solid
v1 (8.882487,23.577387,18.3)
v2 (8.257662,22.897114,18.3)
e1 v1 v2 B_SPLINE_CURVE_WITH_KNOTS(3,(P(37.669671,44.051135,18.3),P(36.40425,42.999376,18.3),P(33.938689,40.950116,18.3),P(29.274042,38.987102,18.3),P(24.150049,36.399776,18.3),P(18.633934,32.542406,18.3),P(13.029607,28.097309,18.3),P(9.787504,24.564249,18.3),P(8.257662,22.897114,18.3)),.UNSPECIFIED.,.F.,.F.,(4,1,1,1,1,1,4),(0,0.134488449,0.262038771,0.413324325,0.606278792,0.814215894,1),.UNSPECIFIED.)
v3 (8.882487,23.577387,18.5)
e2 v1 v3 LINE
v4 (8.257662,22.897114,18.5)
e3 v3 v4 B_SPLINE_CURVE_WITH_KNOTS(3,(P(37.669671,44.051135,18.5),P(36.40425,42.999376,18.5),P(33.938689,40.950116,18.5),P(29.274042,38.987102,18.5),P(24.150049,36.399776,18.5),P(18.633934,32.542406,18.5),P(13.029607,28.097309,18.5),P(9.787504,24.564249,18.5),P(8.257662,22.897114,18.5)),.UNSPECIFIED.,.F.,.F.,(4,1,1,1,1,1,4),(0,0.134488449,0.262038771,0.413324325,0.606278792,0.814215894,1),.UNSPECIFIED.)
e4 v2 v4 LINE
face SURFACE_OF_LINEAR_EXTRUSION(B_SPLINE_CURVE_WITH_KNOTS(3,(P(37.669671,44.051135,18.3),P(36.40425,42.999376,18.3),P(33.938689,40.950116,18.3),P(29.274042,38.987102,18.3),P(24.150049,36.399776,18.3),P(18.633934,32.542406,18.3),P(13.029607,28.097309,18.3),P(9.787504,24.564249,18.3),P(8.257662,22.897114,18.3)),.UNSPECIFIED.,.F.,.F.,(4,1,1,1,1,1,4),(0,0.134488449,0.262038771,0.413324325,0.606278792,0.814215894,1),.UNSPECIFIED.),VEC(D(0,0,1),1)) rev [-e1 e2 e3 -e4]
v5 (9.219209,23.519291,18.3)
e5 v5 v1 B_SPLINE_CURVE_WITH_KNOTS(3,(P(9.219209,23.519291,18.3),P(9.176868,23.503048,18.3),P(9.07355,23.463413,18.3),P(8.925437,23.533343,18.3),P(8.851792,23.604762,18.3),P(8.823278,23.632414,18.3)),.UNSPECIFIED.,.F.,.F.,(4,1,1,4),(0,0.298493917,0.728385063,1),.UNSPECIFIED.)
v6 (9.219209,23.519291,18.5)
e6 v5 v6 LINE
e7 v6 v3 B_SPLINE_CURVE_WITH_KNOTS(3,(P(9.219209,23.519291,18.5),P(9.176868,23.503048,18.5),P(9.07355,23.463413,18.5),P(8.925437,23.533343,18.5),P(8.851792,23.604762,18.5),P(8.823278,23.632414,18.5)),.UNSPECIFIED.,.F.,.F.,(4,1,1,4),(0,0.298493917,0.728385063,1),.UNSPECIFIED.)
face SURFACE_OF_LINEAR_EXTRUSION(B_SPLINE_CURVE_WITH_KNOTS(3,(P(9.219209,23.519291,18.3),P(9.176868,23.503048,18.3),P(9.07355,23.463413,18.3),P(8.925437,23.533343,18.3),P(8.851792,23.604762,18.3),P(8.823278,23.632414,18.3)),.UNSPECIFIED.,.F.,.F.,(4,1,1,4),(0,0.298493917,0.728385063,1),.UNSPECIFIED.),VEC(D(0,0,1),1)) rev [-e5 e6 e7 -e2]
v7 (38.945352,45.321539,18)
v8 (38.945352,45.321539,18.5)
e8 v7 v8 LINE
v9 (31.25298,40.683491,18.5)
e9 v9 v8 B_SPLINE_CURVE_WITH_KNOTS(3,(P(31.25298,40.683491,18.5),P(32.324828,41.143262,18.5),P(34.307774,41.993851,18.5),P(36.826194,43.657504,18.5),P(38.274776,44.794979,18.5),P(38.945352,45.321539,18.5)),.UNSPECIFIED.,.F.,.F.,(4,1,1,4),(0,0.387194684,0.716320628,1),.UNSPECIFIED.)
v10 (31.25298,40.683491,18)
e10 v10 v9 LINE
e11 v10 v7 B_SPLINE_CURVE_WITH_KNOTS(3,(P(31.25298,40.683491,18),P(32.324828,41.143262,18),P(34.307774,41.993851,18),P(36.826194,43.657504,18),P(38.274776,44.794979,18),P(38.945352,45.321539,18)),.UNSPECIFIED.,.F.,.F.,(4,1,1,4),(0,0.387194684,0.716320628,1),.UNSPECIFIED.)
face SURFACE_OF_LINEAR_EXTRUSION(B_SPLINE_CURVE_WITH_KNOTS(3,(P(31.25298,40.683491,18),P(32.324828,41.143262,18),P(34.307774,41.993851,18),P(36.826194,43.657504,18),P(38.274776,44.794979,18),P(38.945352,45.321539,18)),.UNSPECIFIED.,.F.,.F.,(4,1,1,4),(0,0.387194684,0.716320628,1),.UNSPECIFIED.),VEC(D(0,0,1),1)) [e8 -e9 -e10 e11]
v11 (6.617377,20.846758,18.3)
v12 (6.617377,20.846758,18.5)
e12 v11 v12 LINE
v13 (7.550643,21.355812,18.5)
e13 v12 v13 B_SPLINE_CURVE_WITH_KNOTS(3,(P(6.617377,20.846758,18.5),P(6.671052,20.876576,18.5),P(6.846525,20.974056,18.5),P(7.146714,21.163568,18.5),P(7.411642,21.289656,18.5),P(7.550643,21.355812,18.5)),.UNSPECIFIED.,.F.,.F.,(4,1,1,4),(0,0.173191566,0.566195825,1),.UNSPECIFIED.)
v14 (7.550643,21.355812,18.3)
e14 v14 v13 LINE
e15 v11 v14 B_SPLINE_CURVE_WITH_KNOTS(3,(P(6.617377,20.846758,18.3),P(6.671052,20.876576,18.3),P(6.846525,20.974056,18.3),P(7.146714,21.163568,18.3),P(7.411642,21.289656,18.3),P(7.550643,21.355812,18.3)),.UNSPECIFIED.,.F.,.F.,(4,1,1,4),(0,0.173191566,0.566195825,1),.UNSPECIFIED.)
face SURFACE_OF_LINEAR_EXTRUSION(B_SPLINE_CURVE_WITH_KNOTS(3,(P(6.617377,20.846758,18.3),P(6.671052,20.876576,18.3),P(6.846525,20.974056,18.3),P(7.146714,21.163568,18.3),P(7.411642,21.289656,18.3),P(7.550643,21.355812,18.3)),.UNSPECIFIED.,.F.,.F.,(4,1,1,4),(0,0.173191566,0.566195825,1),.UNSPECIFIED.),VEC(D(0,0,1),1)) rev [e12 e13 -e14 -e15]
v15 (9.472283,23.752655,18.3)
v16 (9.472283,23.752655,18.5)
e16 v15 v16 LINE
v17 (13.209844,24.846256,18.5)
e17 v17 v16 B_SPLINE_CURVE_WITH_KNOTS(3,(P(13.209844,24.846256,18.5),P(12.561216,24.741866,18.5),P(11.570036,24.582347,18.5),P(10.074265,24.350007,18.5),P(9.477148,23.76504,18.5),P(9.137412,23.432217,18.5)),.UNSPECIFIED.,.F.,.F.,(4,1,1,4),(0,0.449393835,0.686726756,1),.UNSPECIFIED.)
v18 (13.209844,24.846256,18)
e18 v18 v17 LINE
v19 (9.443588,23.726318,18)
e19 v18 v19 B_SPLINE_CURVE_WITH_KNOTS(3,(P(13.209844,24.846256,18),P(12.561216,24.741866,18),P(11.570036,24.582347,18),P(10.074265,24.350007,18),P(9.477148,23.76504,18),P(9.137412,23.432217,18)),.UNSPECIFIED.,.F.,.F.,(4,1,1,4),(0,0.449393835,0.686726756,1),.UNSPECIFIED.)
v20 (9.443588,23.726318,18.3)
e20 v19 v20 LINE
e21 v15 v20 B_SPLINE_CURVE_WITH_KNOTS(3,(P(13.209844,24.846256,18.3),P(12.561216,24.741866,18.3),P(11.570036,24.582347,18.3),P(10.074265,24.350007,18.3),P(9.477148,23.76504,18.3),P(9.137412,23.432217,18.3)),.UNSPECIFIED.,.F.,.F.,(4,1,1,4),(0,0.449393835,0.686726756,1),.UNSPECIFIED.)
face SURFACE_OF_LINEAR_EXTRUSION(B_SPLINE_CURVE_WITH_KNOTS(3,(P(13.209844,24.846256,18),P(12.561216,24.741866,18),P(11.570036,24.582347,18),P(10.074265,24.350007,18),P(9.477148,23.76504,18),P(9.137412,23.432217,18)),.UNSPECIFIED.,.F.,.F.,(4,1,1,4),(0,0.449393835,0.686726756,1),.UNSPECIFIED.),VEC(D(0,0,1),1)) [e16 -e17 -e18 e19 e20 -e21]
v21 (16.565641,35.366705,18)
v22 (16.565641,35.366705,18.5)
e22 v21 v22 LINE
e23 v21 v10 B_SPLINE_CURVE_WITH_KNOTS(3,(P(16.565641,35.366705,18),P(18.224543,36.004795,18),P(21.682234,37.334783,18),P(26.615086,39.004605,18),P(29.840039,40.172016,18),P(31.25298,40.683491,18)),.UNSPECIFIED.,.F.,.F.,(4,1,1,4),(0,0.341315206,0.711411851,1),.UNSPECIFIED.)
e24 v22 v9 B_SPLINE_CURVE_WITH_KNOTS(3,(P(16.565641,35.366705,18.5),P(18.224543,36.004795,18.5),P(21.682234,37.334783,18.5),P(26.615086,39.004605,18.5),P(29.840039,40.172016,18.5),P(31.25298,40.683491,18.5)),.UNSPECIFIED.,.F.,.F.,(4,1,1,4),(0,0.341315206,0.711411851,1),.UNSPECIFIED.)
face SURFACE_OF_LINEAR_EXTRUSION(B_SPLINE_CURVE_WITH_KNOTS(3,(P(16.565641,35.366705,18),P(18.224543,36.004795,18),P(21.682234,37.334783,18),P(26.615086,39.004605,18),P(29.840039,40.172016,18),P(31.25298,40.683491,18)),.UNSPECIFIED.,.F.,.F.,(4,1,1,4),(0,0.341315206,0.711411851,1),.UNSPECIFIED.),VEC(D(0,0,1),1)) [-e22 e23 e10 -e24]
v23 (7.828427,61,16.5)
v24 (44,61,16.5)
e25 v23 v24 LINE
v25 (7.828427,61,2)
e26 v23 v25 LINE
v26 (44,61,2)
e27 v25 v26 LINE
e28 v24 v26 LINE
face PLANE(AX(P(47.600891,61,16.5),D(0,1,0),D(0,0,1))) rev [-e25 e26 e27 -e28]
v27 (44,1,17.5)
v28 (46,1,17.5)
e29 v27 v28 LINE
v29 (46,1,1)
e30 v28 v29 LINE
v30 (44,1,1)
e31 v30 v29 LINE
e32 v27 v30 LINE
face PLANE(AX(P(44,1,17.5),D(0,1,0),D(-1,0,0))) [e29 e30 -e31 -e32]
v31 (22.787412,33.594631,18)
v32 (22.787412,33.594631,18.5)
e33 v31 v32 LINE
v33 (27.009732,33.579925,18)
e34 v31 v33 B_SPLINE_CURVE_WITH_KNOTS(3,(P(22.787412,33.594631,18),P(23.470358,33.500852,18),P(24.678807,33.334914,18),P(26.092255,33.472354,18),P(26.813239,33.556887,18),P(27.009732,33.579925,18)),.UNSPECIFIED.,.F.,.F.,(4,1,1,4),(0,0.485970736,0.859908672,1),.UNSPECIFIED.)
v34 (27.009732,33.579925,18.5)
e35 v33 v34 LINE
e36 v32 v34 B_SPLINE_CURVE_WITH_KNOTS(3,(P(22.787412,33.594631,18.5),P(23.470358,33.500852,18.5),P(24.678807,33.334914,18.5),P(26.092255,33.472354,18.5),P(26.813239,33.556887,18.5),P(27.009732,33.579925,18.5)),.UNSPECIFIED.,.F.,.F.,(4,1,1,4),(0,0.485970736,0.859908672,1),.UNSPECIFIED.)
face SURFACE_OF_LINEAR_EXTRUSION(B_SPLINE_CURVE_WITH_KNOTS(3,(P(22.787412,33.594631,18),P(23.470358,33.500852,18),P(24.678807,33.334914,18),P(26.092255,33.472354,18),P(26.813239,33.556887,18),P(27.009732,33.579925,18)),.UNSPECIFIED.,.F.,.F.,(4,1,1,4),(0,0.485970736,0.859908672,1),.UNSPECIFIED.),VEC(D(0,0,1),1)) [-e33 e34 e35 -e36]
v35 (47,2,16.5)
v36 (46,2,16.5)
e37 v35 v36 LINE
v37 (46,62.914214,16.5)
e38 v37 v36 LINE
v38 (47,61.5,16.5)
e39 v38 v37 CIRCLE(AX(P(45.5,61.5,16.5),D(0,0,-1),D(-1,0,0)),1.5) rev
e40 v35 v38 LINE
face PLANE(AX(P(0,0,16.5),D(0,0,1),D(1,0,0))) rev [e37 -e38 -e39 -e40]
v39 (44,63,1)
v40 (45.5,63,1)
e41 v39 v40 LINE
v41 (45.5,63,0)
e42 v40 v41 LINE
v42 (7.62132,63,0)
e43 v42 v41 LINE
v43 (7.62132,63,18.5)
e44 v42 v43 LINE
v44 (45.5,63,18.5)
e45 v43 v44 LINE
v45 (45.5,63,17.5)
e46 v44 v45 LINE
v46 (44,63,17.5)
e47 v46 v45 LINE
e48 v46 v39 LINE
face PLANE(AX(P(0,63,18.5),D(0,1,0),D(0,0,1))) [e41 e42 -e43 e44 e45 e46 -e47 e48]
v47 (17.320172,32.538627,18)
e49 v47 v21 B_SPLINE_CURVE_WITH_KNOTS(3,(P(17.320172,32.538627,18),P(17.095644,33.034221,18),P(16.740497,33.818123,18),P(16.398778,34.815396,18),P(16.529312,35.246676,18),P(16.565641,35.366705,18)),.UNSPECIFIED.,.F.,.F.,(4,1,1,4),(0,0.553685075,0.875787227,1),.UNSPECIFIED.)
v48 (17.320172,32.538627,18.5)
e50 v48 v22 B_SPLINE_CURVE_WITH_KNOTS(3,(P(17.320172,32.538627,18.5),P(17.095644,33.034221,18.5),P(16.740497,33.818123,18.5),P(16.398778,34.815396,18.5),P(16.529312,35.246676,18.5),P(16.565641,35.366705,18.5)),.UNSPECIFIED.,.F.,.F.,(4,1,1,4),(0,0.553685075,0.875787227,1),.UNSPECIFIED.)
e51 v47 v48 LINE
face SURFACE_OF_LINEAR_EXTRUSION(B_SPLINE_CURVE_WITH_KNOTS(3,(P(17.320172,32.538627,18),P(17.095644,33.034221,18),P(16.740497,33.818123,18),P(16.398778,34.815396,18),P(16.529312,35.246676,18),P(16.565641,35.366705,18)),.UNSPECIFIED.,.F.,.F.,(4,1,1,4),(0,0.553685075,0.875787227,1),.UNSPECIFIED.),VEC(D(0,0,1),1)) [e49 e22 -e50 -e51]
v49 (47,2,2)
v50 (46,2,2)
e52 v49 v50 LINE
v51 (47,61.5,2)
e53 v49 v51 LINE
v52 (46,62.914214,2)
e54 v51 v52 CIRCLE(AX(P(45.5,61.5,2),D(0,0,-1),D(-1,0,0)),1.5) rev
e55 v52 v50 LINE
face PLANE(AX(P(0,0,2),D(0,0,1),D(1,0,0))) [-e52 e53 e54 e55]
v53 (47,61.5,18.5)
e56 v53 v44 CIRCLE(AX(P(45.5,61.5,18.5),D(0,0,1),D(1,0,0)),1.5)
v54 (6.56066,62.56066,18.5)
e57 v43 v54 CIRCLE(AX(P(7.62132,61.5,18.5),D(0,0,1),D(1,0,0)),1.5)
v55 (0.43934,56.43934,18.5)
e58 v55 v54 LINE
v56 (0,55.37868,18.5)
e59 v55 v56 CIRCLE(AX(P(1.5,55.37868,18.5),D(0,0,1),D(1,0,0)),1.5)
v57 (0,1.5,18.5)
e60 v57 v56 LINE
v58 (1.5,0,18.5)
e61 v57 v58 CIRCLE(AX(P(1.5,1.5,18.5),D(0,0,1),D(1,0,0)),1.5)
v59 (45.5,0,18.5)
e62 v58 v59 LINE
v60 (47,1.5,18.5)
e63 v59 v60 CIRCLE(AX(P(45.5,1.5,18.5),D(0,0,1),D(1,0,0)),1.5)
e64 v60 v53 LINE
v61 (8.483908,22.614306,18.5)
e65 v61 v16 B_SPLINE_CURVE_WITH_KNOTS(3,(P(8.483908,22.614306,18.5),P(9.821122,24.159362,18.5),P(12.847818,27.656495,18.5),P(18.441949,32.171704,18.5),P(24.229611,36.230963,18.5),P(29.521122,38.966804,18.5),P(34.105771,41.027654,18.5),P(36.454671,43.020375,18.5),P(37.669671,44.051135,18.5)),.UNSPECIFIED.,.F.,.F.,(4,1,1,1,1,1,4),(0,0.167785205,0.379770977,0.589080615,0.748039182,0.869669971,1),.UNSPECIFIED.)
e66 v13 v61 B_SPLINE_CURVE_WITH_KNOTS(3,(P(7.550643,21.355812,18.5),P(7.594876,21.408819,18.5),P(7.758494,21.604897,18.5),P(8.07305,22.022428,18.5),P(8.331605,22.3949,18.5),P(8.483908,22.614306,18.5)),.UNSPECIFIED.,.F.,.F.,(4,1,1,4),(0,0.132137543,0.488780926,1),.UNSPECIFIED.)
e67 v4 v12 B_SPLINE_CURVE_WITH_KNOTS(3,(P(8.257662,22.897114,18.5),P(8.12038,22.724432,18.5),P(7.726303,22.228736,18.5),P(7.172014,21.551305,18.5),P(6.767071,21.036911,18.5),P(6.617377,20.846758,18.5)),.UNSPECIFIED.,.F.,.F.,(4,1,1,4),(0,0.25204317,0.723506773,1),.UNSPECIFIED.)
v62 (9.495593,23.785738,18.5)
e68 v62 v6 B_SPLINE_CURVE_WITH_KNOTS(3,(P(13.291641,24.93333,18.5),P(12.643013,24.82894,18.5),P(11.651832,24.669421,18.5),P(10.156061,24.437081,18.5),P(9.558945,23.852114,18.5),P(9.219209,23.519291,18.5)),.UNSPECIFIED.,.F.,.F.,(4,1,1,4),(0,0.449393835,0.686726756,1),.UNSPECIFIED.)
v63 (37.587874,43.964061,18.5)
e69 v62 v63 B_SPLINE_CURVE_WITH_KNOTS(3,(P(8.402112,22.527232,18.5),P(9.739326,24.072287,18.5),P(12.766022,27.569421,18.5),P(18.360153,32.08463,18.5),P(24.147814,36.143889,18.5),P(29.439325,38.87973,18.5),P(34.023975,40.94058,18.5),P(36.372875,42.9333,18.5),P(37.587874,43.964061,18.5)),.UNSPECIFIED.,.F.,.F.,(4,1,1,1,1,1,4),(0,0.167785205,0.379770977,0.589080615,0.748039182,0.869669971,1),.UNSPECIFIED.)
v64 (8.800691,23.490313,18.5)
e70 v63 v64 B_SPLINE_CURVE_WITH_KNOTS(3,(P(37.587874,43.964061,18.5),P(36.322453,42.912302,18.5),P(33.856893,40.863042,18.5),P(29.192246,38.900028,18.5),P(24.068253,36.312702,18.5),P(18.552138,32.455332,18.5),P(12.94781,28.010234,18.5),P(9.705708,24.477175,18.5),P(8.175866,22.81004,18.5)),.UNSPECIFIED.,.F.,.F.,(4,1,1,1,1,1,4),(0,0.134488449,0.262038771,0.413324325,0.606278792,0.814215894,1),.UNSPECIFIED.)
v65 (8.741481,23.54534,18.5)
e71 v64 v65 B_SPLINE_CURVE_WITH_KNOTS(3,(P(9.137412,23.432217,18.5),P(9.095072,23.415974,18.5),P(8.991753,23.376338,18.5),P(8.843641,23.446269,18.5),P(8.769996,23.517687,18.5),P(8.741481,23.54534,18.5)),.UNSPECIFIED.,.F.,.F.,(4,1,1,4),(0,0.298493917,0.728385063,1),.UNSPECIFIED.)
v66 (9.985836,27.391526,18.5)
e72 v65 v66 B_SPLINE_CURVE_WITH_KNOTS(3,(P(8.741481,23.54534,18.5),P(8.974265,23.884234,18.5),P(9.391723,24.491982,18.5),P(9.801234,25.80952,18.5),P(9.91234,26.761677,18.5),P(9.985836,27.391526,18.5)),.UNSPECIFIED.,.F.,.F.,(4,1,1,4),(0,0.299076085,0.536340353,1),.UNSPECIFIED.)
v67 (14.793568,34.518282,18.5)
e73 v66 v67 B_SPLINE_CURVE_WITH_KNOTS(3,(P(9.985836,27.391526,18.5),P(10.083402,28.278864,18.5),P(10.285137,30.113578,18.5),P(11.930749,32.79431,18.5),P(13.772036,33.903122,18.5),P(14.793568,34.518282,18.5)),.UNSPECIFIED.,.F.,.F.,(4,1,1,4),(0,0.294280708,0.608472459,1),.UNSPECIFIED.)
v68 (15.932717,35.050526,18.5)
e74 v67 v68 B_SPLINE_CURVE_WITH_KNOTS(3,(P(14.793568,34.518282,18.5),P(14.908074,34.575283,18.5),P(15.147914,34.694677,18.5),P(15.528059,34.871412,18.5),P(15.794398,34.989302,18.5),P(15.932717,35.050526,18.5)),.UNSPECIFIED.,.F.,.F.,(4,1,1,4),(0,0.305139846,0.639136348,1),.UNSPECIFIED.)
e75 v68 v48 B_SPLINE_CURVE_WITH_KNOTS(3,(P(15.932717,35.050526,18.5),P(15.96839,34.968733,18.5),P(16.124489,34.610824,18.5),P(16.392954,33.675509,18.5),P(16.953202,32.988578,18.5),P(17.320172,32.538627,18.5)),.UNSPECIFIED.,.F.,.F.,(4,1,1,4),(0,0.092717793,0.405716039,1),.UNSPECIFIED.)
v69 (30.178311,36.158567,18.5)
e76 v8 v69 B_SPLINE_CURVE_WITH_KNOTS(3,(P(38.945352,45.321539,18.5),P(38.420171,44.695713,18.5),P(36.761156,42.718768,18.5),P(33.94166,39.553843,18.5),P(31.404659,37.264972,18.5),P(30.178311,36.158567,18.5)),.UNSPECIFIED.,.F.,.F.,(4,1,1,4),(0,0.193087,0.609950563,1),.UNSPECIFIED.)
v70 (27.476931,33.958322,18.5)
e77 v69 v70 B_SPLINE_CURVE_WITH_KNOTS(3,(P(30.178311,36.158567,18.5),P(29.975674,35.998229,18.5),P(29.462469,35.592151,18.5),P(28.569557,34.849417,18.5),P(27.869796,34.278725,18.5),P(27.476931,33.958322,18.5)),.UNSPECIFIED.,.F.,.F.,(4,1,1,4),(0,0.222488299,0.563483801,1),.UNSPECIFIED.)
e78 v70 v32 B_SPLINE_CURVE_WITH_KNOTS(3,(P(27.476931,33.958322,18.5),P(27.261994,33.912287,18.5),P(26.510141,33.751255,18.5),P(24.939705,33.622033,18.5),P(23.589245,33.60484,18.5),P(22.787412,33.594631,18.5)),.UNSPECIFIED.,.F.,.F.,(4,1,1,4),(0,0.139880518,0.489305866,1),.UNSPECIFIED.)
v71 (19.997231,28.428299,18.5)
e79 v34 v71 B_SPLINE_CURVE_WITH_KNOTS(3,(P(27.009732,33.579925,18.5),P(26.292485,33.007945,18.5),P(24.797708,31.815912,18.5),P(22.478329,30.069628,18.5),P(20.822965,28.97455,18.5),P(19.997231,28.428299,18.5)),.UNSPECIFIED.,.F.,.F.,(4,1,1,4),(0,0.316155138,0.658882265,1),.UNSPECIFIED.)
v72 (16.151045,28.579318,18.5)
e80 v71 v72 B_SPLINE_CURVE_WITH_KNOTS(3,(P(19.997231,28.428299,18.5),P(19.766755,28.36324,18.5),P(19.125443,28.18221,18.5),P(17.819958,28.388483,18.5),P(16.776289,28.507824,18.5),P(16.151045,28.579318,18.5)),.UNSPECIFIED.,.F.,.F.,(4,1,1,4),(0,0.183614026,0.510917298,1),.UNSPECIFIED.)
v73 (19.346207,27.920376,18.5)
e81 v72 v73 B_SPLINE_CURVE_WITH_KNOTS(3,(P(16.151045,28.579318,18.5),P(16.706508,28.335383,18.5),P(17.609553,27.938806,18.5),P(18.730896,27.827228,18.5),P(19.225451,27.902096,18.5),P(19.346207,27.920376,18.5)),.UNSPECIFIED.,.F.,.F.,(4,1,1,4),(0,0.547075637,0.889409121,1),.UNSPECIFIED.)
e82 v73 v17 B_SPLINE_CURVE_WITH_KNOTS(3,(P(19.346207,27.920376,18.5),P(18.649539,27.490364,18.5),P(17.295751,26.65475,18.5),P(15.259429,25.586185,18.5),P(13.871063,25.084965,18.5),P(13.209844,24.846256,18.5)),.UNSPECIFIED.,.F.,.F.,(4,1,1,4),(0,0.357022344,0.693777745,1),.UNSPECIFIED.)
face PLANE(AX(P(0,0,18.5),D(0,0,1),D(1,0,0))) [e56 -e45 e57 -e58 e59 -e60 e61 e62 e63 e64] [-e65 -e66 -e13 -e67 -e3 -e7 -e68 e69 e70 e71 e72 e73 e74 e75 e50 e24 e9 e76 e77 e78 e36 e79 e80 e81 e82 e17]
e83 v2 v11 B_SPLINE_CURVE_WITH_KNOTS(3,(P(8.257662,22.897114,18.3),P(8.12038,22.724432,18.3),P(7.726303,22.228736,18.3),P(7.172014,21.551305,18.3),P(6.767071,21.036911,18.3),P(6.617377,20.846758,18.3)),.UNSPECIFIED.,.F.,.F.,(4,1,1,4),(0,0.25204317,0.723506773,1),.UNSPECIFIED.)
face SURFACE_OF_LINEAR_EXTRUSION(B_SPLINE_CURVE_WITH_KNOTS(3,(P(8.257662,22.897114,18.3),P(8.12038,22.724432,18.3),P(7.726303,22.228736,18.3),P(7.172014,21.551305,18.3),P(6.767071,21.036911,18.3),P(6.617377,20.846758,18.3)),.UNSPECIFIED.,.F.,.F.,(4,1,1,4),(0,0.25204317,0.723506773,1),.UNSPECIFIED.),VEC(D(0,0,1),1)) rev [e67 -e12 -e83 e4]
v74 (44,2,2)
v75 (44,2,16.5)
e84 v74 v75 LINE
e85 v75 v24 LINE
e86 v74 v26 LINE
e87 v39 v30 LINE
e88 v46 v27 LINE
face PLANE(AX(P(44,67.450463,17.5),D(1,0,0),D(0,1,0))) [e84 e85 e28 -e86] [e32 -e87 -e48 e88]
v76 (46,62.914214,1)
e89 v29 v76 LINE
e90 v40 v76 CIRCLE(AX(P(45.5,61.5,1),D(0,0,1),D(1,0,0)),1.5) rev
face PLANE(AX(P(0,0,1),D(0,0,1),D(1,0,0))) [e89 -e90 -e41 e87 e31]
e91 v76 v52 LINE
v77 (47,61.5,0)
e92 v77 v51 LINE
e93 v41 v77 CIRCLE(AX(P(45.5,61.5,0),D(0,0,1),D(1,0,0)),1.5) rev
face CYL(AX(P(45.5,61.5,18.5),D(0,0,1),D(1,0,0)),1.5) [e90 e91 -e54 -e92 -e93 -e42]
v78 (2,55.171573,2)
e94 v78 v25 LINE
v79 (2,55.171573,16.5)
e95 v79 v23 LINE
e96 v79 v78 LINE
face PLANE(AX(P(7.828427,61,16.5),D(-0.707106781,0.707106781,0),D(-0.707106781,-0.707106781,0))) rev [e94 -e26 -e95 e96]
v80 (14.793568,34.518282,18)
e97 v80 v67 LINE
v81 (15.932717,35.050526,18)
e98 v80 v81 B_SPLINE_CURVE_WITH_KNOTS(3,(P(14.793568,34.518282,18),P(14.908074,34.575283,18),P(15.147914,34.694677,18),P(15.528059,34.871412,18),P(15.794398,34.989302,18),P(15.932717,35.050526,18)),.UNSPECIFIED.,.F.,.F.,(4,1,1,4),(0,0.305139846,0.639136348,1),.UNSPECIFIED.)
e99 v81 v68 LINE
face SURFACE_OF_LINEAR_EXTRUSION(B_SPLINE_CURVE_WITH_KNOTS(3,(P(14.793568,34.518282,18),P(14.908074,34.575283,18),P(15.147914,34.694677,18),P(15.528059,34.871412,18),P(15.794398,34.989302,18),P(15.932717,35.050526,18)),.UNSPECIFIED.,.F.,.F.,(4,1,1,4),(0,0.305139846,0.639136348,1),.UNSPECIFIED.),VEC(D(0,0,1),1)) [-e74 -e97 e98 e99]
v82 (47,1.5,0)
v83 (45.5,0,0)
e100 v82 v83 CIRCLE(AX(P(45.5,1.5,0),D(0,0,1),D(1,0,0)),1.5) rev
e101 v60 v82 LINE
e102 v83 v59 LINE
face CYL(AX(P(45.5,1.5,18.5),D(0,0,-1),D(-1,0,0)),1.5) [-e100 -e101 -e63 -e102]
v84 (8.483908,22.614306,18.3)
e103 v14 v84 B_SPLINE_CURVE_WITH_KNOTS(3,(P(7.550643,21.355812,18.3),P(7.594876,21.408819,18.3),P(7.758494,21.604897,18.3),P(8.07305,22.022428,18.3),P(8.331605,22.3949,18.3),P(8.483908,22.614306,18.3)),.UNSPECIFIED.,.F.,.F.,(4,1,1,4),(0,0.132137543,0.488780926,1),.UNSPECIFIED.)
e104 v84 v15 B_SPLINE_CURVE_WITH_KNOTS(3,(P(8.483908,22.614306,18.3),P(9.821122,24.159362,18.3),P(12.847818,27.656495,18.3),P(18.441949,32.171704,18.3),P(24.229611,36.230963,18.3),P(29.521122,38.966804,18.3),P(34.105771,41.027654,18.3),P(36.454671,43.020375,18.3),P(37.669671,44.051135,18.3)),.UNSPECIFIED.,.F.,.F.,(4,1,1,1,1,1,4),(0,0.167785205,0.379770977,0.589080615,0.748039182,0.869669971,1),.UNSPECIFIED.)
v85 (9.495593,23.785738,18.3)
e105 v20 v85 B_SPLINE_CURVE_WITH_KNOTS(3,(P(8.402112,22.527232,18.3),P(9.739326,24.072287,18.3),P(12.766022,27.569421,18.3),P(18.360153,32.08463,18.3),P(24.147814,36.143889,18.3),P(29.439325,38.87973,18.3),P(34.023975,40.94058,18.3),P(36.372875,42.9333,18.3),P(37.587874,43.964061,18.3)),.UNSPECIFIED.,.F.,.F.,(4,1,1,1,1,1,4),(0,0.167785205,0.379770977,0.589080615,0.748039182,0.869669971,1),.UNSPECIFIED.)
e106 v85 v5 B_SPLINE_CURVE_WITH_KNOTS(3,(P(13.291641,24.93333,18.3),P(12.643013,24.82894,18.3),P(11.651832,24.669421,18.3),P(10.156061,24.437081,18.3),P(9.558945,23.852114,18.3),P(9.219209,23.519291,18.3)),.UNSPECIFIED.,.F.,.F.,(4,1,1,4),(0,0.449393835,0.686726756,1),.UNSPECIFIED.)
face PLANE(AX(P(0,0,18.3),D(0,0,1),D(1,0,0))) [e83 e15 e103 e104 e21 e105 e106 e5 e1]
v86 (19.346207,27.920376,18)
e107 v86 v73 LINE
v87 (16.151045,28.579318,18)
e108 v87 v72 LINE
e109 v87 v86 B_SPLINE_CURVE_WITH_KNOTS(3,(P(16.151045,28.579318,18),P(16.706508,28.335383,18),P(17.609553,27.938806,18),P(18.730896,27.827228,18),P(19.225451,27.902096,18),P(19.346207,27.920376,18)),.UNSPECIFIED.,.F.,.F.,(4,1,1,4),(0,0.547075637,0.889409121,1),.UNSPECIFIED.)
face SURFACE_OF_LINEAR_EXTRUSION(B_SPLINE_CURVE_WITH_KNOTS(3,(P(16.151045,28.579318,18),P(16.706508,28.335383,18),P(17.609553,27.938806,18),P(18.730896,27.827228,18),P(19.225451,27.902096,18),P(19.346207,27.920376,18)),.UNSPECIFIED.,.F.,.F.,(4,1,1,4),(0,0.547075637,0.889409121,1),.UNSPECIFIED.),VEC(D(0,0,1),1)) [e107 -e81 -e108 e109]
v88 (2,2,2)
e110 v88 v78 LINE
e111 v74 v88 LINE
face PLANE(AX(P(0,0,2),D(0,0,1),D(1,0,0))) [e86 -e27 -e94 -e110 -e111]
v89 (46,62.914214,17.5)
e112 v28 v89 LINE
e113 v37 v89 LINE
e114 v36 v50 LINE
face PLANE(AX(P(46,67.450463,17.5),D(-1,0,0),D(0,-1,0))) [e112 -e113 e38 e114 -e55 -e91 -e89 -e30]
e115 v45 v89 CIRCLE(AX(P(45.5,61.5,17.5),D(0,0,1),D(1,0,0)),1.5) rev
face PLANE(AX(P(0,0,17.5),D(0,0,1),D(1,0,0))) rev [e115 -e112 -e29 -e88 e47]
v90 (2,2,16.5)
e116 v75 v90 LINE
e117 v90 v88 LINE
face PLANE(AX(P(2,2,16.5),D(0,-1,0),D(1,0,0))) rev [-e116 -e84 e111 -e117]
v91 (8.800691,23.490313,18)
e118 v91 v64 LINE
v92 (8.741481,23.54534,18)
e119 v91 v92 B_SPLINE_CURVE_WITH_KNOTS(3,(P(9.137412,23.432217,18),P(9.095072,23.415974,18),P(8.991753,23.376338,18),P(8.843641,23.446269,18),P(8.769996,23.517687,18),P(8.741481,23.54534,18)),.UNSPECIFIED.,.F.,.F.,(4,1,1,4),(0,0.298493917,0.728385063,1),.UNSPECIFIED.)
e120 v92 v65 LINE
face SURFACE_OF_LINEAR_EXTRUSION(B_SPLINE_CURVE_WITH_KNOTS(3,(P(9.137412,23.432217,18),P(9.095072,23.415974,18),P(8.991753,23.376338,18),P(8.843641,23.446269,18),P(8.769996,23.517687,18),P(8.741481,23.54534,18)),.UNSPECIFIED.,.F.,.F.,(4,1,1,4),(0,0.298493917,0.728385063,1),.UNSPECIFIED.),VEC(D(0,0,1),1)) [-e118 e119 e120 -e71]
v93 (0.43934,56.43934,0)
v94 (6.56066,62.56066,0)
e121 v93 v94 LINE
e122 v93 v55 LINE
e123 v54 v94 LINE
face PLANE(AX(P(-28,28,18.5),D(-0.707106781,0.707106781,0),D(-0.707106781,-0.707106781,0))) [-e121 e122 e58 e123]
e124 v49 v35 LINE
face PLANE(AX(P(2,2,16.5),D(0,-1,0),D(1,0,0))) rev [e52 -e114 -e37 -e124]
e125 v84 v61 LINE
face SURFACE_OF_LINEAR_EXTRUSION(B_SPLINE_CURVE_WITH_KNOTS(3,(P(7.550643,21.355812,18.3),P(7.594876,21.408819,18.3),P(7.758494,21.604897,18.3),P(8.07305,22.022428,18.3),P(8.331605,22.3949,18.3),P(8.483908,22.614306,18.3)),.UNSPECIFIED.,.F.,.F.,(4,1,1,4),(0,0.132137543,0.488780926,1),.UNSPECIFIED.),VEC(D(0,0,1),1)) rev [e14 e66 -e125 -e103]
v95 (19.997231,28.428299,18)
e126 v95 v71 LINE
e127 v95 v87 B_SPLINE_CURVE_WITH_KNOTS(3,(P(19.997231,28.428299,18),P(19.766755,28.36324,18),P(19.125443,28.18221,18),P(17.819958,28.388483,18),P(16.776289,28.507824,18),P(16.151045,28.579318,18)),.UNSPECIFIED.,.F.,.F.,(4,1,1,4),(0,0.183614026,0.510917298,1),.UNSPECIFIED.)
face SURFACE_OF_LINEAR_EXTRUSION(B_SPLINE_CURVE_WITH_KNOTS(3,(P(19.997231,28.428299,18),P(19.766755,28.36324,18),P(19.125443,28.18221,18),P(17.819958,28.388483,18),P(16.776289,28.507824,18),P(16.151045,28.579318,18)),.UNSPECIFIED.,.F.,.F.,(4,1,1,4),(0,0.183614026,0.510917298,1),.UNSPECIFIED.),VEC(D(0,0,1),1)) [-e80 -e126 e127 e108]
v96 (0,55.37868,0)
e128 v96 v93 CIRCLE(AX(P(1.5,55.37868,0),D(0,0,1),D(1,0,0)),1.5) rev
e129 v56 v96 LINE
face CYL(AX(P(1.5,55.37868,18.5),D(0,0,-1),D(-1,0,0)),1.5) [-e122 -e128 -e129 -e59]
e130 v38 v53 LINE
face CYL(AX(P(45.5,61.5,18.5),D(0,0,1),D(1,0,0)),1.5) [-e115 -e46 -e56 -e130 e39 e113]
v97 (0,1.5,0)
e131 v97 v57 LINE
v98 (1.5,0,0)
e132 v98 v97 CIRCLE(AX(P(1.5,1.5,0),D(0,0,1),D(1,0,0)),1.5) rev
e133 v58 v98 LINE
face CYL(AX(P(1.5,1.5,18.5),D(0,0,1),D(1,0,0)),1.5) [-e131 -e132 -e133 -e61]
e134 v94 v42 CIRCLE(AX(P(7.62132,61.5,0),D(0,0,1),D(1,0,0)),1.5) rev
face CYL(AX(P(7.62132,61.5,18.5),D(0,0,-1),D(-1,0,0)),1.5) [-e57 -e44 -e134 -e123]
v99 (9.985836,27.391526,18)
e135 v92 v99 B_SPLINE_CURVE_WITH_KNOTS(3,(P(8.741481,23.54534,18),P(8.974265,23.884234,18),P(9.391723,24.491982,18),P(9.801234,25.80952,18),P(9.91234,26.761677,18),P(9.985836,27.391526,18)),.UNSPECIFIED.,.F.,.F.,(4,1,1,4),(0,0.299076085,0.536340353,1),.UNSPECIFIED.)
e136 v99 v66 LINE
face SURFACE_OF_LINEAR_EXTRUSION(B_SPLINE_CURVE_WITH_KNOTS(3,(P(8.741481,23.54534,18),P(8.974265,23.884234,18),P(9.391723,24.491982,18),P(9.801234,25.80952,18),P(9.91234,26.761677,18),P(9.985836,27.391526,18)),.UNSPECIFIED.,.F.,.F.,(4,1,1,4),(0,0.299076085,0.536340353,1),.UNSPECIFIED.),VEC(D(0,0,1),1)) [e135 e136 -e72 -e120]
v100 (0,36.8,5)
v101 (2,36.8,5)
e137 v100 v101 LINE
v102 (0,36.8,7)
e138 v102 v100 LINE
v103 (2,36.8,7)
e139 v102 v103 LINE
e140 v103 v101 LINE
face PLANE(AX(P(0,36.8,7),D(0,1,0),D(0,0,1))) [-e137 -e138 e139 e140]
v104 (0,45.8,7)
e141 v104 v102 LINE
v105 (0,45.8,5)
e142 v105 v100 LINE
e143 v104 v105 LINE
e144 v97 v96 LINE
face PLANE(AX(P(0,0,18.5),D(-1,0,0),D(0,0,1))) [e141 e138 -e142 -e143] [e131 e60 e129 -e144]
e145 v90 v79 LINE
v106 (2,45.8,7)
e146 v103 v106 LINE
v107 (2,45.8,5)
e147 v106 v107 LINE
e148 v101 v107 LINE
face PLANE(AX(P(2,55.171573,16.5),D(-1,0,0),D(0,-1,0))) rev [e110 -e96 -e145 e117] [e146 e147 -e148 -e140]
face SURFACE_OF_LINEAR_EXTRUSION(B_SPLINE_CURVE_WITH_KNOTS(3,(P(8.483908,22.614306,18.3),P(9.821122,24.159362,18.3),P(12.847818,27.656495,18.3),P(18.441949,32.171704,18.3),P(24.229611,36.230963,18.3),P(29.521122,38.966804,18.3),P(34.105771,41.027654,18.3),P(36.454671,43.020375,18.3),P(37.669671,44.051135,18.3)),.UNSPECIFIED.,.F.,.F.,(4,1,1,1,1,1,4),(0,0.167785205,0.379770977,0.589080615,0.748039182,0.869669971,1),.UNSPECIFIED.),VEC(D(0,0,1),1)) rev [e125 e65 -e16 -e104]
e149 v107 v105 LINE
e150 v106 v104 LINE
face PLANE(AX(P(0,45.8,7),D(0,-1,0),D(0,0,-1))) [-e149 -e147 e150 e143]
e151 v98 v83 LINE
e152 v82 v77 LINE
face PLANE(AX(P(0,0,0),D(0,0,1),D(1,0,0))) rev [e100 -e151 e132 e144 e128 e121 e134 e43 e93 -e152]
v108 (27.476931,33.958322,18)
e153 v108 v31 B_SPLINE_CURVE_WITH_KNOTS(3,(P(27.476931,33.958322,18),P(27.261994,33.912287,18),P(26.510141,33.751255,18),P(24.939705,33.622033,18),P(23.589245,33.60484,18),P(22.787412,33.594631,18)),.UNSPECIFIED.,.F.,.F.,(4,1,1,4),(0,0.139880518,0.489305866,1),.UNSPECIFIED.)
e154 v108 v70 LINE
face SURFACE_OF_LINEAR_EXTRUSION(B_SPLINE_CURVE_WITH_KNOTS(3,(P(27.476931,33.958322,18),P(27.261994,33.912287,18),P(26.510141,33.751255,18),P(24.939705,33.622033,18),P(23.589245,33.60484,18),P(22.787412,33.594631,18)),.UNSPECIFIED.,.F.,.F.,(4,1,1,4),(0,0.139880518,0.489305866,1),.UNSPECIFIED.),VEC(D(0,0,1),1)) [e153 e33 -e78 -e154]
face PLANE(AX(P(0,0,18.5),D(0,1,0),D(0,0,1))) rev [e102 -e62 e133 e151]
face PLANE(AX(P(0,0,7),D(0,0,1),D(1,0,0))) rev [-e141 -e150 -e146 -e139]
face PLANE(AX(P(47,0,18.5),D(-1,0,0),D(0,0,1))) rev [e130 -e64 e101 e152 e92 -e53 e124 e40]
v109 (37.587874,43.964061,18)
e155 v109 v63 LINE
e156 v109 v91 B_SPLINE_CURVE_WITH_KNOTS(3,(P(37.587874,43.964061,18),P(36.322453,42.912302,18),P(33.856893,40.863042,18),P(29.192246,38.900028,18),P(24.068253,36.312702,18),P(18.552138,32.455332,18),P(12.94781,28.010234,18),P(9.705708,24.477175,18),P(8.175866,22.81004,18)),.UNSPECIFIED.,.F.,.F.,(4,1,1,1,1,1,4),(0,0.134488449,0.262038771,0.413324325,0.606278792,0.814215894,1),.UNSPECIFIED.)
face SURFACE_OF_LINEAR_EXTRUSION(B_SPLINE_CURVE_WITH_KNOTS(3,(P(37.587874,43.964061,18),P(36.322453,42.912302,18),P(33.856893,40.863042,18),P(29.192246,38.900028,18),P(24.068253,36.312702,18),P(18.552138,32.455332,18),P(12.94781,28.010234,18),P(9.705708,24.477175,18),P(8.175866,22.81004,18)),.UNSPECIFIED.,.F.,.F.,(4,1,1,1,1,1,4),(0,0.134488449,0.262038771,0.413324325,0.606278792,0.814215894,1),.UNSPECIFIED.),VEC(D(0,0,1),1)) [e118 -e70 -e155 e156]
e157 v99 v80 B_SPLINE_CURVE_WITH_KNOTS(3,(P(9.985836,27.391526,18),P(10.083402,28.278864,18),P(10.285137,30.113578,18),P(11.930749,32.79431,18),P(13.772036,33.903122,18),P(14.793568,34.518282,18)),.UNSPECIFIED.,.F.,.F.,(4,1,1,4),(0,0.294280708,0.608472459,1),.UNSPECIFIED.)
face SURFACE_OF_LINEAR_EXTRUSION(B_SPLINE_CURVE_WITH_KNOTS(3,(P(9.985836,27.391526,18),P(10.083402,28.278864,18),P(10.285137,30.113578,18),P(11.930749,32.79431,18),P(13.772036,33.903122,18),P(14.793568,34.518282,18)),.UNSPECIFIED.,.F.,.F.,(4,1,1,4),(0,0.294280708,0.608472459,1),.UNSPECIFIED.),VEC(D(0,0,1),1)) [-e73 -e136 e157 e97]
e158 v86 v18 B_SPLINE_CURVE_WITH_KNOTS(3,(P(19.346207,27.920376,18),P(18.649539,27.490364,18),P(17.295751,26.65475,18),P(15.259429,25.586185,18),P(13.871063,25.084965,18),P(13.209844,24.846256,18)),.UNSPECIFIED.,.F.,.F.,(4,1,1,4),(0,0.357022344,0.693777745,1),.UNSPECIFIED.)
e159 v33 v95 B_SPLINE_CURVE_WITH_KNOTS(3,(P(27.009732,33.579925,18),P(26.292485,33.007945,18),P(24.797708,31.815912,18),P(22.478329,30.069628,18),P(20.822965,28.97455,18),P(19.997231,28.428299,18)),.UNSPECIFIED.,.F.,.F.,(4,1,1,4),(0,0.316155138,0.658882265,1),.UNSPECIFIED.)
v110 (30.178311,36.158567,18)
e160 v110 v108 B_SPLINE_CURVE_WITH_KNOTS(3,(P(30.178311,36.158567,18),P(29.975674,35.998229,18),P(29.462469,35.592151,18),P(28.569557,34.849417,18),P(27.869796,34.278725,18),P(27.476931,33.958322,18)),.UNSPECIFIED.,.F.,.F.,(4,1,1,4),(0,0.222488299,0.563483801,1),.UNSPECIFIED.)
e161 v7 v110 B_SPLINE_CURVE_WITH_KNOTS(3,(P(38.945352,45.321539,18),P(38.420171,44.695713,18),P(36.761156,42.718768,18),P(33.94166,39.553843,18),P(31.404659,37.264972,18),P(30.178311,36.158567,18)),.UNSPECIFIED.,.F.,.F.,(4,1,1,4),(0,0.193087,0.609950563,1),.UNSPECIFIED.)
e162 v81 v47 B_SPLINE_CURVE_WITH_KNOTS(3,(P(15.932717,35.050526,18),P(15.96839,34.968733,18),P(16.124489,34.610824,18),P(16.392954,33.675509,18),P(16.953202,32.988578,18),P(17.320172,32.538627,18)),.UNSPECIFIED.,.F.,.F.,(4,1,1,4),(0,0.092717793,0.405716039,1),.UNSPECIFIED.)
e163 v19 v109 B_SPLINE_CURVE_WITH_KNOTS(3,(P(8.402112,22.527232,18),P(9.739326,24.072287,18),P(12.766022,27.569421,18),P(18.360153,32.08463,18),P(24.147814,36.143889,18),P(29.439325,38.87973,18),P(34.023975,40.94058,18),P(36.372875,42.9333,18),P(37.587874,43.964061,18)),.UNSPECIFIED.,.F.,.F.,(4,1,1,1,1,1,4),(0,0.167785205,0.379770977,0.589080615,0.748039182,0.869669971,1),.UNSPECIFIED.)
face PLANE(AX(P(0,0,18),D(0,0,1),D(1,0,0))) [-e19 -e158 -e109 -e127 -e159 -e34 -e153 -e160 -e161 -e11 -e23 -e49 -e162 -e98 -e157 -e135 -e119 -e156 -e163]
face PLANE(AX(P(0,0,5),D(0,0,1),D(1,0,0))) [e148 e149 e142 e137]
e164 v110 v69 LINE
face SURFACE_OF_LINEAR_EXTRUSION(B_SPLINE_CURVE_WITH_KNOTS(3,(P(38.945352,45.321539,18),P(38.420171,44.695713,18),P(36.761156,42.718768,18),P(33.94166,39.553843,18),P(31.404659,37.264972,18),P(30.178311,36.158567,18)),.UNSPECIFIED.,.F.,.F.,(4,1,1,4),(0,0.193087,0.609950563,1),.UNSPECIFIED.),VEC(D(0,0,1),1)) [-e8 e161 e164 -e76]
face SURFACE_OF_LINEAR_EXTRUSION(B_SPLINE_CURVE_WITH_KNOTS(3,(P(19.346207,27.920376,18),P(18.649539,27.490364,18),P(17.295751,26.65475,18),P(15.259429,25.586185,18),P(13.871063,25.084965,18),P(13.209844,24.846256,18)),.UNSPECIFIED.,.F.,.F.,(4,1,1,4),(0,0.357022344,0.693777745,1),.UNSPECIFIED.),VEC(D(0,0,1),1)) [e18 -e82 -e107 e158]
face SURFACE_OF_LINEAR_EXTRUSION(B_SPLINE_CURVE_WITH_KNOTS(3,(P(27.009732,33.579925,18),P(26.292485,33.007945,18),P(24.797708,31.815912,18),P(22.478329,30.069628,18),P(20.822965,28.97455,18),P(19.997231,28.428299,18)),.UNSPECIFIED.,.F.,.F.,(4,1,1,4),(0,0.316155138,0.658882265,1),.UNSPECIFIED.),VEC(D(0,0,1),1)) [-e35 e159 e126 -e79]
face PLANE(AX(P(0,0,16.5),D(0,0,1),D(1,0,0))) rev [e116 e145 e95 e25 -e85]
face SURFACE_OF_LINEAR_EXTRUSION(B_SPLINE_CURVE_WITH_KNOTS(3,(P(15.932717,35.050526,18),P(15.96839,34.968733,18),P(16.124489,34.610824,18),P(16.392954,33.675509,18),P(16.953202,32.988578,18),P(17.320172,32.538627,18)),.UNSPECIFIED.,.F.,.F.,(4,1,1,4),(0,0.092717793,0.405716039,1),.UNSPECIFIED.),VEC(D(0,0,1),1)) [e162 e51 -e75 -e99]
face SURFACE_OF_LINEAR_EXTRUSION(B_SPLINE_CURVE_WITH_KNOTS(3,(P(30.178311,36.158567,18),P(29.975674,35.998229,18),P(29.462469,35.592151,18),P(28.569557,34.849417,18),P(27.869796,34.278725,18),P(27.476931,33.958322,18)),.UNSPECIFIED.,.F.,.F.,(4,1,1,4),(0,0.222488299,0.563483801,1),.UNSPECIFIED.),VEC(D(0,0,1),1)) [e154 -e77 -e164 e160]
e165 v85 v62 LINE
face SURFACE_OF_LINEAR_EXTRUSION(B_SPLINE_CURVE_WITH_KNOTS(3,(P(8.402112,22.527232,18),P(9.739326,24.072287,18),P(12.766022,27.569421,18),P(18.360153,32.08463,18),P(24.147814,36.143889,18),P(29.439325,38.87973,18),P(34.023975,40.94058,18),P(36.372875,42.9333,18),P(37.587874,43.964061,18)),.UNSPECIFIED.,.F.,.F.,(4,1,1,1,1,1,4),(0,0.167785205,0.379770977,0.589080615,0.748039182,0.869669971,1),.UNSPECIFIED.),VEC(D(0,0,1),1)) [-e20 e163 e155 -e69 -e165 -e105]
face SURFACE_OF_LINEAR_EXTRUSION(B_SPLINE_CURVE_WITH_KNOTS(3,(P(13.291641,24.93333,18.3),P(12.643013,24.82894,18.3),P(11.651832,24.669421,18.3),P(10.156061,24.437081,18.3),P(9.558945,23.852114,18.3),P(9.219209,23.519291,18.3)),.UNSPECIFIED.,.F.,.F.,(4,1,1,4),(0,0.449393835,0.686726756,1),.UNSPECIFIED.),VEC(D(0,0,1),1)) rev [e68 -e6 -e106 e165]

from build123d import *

# Parameters (mm, degrees)
BOSS_EXTRU_1_DEPTH            = 18.5
ESQUISSE5_W                   = 18.5
ESQUISSE5_H                   = 9.899494937
BOSS_EXTRU_3_DEPTH            = 1.5
CONG_1_R                      = 1.5
ENL_V_MAT_EXTRU_7_DEPTH       = 0.5
ENL_V_MAT_EXTRU_9_DEPTH       = 0.2
ENL_V_START                   = -2
ENL_V_MAT_EXTRU_10_DEPTH      = 14.5
ENL_V_MAT_EXTRU_11_DEPTH      = 15.5
ENL_V_MAT_EXTRU_11_DEPTH_BACK = 1
ESQUISSE11_W                  = 2
ESQUISSE11_H                  = 66.45046337
ESQUISSE12_W                  = 2.477505898
ESQUISSE12_H                  = 3.959677151
ENL_V_MAT_EXTRU_12_DEPTH      = 14.5
ENL_V_START_2                 = 3
ESQUISSE13_W                  = 2
ESQUISSE13_H                  = 9
ENL_V_MAT_EXTRU_13_DEPTH      = 2


with BuildPart() as part:
    # Esquisse1 → Boss.-Extru.1 (new body)
    with BuildSketch(Plane.XY):
        Polygon((7, 63), (0, 56), (0, 0), (47, 0), (47, 63), align=None)
    extrude(amount=BOSS_EXTRU_1_DEPTH)

    # Esquisse5 → Boss.-Extru.3 (add)
    with BuildSketch(Plane(origin=(-28, 28, 0), x_dir=(0, 0, 1), z_dir=(-0.707106781186549, 0.7071067811865462, 0))):
        with Locations((9.25, 44.547727215)):
            Rectangle(ESQUISSE5_W, ESQUISSE5_H)
    extrude(amount=-BOSS_EXTRU_3_DEPTH)

    # Congé1
    cong_1_edges = [part.edges().sort_by_distance(p)[0] for p in [
        (0, 0, 9.25),
        (47, 0, 9.25),
        (47, 63, 9.25),
        (0, 56, 9.25),
        (7, 63, 9.25),
    ]]
    fillet(cong_1_edges, radius=CONG_1_R)

    # Esquisse7 → Enlèv. mat.-Extru.7 (cut)
    with BuildSketch(Plane.XY.offset(18.5)):
        with BuildLine():
            add(Edge.make_bspline(
                [(8.741481422, 23.545339958), (8.97426544, 23.884234425), (9.391722632, 24.491982042), (9.801234093, 25.809520444), (9.912339585, 26.761676513), (9.985835627, 27.391525683)],
                knots=[0, 0, 0, 0, 0.299076085, 0.536340353, 1, 1, 1, 1], degree=3))
            add(Edge.make_bspline(
                [(8.800690837, 23.490312703), (8.780021094, 23.50796535), (8.760751258, 23.526652654), (8.741481422, 23.545339958)],
                knots=[0.816445355, 0.816445355, 0.816445355, 0.816445355, 1, 1, 1, 1], degree=3))
            add(Edge.make_bspline(
                [(37.587874359, 43.964061233), (36.322453208, 42.912301808), (33.856892738, 40.863042189), (29.192246001, 38.90002762), (24.068252551, 36.312701669), (18.552137849, 32.455332186), (13.189313268, 28.201783406), (10.124203366, 24.92862823), (8.800690837, 23.490312703)],
                knots=[0, 0, 0, 0, 0.134488449, 0.262038771, 0.413324325, 0.606278792, 0.814215894, 0.974718857, 0.974718857, 0.974718857, 0.974718857], degree=3))
            add(Edge.make_bspline(
                [(9.443588409, 23.726318154), (10.439928849, 24.865322019), (13.17889562, 27.902664607), (18.360152512, 32.08462974), (24.147814444, 36.14388912), (29.439325332, 38.879729859), (34.023974897, 40.940579508), (36.372875034, 42.933300323), (37.587874359, 43.964061233)],
                knots=[0.043476968, 0.043476968, 0.043476968, 0.043476968, 0.167785205, 0.379770977, 0.589080615, 0.748039182, 0.869669971, 1, 1, 1, 1], degree=3))
            add(Edge.make_bspline(
                [(13.209844249, 24.846255718), (12.561216207, 24.741866177), (11.570036096, 24.582346652), (10.21413428, 24.371732671), (9.686497603, 23.950548462), (9.443588409, 23.726318154)],
                knots=[0, 0, 0, 0, 0.449393835, 0.686726756, 0.906490115, 0.906490115, 0.906490115, 0.906490115], degree=3))
            add(Edge.make_bspline(
                [(19.346207327, 27.92037622), (18.649539489, 27.490364128), (17.295751274, 26.654750267), (15.259428846, 25.586185129), (13.871062619, 25.084965025), (13.209844249, 24.846255718)],
                knots=[0, 0, 0, 0, 0.357022344, 0.693777745, 1, 1, 1, 1], degree=3))
            add(Edge.make_bspline(
                [(16.151045098, 28.579318334), (16.706508218, 28.335383374), (17.609553302, 27.93880571), (18.730896282, 27.827227889), (19.225451429, 27.902095693), (19.346207327, 27.92037622)],
                knots=[0, 0, 0, 0, 0.547075637, 0.889409121, 1, 1, 1, 1], degree=3))
            add(Edge.make_bspline(
                [(19.997230823, 28.428298982), (19.766755369, 28.36324029), (19.12544327, 28.182210485), (17.819957633, 28.388483473), (16.776288941, 28.507823681), (16.151045098, 28.579318334)],
                knots=[0, 0, 0, 0, 0.183614026, 0.510917298, 1, 1, 1, 1], degree=3))
            add(Edge.make_bspline(
                [(27.009732384, 33.579925392), (26.292485205, 33.007945409), (24.797708149, 31.815912062), (22.478329122, 30.069627859), (20.822964986, 28.974549539), (19.997230823, 28.428298982)],
                knots=[0, 0, 0, 0, 0.316155138, 0.658882265, 1, 1, 1, 1], degree=3))
            add(Edge.make_bspline(
                [(22.78741232, 33.594631396), (23.47035804, 33.500852352), (24.67880724, 33.334913527), (26.092254902, 33.472354396), (26.813238587, 33.556887188), (27.009732384, 33.579925392)],
                knots=[0, 0, 0, 0, 0.485970736, 0.859908672, 1, 1, 1, 1], degree=3))
            add(Edge.make_bspline(
                [(27.476930827, 33.958322193), (27.261994438, 33.912287048), (26.51014109, 33.751254856), (24.939704804, 33.622032753), (23.589244994, 33.604839722), (22.78741232, 33.594631396)],
                knots=[0, 0, 0, 0, 0.139880518, 0.489305866, 1, 1, 1, 1], degree=3))
            add(Edge.make_bspline(
                [(30.178310683, 36.158566674), (29.975674371, 35.998229226), (29.462468598, 35.592151447), (28.569556831, 34.84941734), (27.869795727, 34.278724604), (27.476930827, 33.958322193)],
                knots=[0, 0, 0, 0, 0.222488299, 0.563483801, 1, 1, 1, 1], degree=3))
            add(Edge.make_bspline(
                [(38.945351674, 45.321538548), (38.420171007, 44.695713388), (36.761155938, 42.718768237), (33.941660103, 39.55384301), (31.404658543, 37.264972007), (30.178310683, 36.158566674)],
                knots=[0, 0, 0, 0, 0.193087, 0.609950563, 1, 1, 1, 1], degree=3))
            add(Edge.make_bspline(
                [(31.252980224, 40.683491056), (32.324827658, 41.14326203), (34.307774375, 41.993850755), (36.826194398, 43.657503938), (38.274775575, 44.794979312), (38.945351674, 45.321538548)],
                knots=[0, 0, 0, 0, 0.387194684, 0.716320628, 1, 1, 1, 1], degree=3))
            add(Edge.make_bspline(
                [(16.565641294, 35.366704907), (18.224543129, 36.00479534), (21.682233863, 37.334783247), (26.615085728, 39.004604912), (29.840038582, 40.172015828), (31.252980224, 40.683491056)],
                knots=[0, 0, 0, 0, 0.341315206, 0.711411851, 1, 1, 1, 1], degree=3))
            add(Edge.make_bspline(
                [(17.320172435, 32.538627168), (17.095643767, 33.034221194), (16.740497225, 33.818123337), (16.398777614, 34.815395743), (16.52931247, 35.246676309), (16.565641294, 35.366704907)],
                knots=[0, 0, 0, 0, 0.553685075, 0.875787227, 1, 1, 1, 1], degree=3))
            add(Edge.make_bspline(
                [(15.932717497, 35.050525816), (15.968390486, 34.968733309), (16.124488937, 34.610824317), (16.392954493, 33.675509429), (16.95320176, 32.988577964), (17.320172435, 32.538627168)],
                knots=[0, 0, 0, 0, 0.092717793, 0.405716039, 1, 1, 1, 1], degree=3))
            add(Edge.make_bspline(
                [(14.793567783, 34.518281585), (14.908073567, 34.57528331), (15.147913789, 34.694677334), (15.52805859, 34.871411668), (15.794398468, 34.989301673), (15.932717497, 35.050525816)],
                knots=[0, 0, 0, 0, 0.305139846, 0.639136348, 1, 1, 1, 1], degree=3))
            add(Edge.make_bspline(
                [(9.985835627, 27.391525683), (10.083402404, 28.278864149), (10.285137329, 30.113578429), (11.930749087, 32.794310056), (13.772036135, 33.90312161), (14.793567783, 34.518281585)],
                knots=[0, 0, 0, 0, 0.294280708, 0.608472459, 1, 1, 1, 1], degree=3))
        make_face()
    extrude(amount=-ENL_V_MAT_EXTRU_7_DEPTH, mode=Mode.SUBTRACT)

    # Esquisse8 → Enlèv. mat.-Extru.9 (cut)
    with BuildSketch(Plane.XY.offset(18.5)):
        with BuildLine():
            add(Edge.make_bspline(
                [(9.219208695, 23.519291104), (9.176868463, 23.503048303), (9.073549799, 23.463412607), (8.952624188, 23.520506831), (8.89240353, 23.568918106), (8.882487226, 23.577386959)],
                knots=[0, 0, 0, 0, 0.298493917, 0.728385063, 0.816445355, 0.816445355, 0.816445355, 0.816445355], degree=3))
            add(Edge.make_bspline(
                [(8.882487226, 23.577386959), (8.674018118, 23.350835), (8.465840191, 23.123974501), (8.257662264, 22.897114002)],
                knots=[0.974718857, 0.974718857, 0.974718857, 0.974718857, 1, 1, 1, 1], degree=3))
            add(Edge.make_bspline(
                [(8.257662264, 22.897114002), (8.120380319, 22.724431783), (7.726303318, 22.228735927), (7.172014223, 21.551305412), (6.767070551, 21.036911066), (6.617377175, 20.846757641)],
                knots=[0, 0, 0, 0, 0.25204317, 0.723506773, 1, 1, 1, 1], degree=3))
            add(Edge.make_bspline(
                [(6.617377175, 20.846757641), (6.67105197, 20.876575617), (6.846524977, 20.974056193), (7.146714282, 21.163568152), (7.411642244, 21.289656477), (7.550642829, 21.355811634)],
                knots=[0, 0, 0, 0, 0.173191566, 0.566195825, 1, 1, 1, 1], degree=3))
            add(Edge.make_bspline(
                [(7.550642829, 21.355811634), (7.594875595, 21.408819409), (7.758493986, 21.604896833), (8.073049619, 22.022428419), (8.331605023, 22.394899892), (8.483908483, 22.614306228)],
                knots=[0, 0, 0, 0, 0.132137543, 0.488780926, 1, 1, 1, 1], degree=3))
            add(Edge.make_bspline(
                [(8.483908483, 22.614306228), (8.830410957, 23.014665275), (9.176913431, 23.415024323), (9.525384799, 23.813392409)],
                knots=[0, 0, 0, 0, 0.043476968, 0.043476968, 0.043476968, 0.043476968], degree=3))
            add(Edge.make_bspline(
                [(9.525384799, 23.813392409), (9.422026301, 23.717981826), (9.320617498, 23.618636465), (9.219208695, 23.519291104)],
                knots=[0.906490115, 0.906490115, 0.906490115, 0.906490115, 1, 1, 1, 1], degree=3))
        make_face()
    extrude(amount=-ENL_V_MAT_EXTRU_9_DEPTH, mode=Mode.SUBTRACT)

    # Esquisse10 → Enlèv. mat.-Extru.10 (cut)
    with BuildSketch(Plane(origin=(0, 0, 0), x_dir=(-1, 0, 0), z_dir=(0, 0, -1)).offset(ENL_V_START)):
        Polygon((-47.600891072, 61), (-7.828427125, 61), (-2, 55.171572875), (-2, 2), (-47.600891072, 2), align=None)
    extrude(amount=-ENL_V_MAT_EXTRU_10_DEPTH, mode=Mode.SUBTRACT)

    # Esquisse11 → Enlèv. mat.-Extru.11 (cut, two sides: drawn at the far end of the back side and taken through both)
    with BuildSketch(Plane.XY.offset(2).offset(-ENL_V_MAT_EXTRU_11_DEPTH_BACK)):
        with Locations((45, 34.225231685)):
            Rectangle(ESQUISSE11_W, ESQUISSE11_H)
    extrude(amount=ENL_V_MAT_EXTRU_11_DEPTH + ENL_V_MAT_EXTRU_11_DEPTH_BACK, mode=Mode.SUBTRACT)

    # Esquisse12 → Enlèv. mat.-Extru.12 (cut)
    with BuildSketch(Plane.XY.offset(2)):
        with Locations((47.238752949, 61.767431922)):
            Rectangle(ESQUISSE12_W, ESQUISSE12_H)
    extrude(amount=ENL_V_MAT_EXTRU_12_DEPTH, mode=Mode.SUBTRACT)

    # Esquisse13 → Enlèv. mat.-Extru.13 (cut)
    with BuildSketch(Plane.XY.offset(2).offset(ENL_V_START_2)):
        with Locations((1, 41.3)):
            Rectangle(ESQUISSE13_W, ESQUISSE13_H)
    extrude(amount=ENL_V_MAT_EXTRU_13_DEPTH, mode=Mode.SUBTRACT)


solid = part.part
